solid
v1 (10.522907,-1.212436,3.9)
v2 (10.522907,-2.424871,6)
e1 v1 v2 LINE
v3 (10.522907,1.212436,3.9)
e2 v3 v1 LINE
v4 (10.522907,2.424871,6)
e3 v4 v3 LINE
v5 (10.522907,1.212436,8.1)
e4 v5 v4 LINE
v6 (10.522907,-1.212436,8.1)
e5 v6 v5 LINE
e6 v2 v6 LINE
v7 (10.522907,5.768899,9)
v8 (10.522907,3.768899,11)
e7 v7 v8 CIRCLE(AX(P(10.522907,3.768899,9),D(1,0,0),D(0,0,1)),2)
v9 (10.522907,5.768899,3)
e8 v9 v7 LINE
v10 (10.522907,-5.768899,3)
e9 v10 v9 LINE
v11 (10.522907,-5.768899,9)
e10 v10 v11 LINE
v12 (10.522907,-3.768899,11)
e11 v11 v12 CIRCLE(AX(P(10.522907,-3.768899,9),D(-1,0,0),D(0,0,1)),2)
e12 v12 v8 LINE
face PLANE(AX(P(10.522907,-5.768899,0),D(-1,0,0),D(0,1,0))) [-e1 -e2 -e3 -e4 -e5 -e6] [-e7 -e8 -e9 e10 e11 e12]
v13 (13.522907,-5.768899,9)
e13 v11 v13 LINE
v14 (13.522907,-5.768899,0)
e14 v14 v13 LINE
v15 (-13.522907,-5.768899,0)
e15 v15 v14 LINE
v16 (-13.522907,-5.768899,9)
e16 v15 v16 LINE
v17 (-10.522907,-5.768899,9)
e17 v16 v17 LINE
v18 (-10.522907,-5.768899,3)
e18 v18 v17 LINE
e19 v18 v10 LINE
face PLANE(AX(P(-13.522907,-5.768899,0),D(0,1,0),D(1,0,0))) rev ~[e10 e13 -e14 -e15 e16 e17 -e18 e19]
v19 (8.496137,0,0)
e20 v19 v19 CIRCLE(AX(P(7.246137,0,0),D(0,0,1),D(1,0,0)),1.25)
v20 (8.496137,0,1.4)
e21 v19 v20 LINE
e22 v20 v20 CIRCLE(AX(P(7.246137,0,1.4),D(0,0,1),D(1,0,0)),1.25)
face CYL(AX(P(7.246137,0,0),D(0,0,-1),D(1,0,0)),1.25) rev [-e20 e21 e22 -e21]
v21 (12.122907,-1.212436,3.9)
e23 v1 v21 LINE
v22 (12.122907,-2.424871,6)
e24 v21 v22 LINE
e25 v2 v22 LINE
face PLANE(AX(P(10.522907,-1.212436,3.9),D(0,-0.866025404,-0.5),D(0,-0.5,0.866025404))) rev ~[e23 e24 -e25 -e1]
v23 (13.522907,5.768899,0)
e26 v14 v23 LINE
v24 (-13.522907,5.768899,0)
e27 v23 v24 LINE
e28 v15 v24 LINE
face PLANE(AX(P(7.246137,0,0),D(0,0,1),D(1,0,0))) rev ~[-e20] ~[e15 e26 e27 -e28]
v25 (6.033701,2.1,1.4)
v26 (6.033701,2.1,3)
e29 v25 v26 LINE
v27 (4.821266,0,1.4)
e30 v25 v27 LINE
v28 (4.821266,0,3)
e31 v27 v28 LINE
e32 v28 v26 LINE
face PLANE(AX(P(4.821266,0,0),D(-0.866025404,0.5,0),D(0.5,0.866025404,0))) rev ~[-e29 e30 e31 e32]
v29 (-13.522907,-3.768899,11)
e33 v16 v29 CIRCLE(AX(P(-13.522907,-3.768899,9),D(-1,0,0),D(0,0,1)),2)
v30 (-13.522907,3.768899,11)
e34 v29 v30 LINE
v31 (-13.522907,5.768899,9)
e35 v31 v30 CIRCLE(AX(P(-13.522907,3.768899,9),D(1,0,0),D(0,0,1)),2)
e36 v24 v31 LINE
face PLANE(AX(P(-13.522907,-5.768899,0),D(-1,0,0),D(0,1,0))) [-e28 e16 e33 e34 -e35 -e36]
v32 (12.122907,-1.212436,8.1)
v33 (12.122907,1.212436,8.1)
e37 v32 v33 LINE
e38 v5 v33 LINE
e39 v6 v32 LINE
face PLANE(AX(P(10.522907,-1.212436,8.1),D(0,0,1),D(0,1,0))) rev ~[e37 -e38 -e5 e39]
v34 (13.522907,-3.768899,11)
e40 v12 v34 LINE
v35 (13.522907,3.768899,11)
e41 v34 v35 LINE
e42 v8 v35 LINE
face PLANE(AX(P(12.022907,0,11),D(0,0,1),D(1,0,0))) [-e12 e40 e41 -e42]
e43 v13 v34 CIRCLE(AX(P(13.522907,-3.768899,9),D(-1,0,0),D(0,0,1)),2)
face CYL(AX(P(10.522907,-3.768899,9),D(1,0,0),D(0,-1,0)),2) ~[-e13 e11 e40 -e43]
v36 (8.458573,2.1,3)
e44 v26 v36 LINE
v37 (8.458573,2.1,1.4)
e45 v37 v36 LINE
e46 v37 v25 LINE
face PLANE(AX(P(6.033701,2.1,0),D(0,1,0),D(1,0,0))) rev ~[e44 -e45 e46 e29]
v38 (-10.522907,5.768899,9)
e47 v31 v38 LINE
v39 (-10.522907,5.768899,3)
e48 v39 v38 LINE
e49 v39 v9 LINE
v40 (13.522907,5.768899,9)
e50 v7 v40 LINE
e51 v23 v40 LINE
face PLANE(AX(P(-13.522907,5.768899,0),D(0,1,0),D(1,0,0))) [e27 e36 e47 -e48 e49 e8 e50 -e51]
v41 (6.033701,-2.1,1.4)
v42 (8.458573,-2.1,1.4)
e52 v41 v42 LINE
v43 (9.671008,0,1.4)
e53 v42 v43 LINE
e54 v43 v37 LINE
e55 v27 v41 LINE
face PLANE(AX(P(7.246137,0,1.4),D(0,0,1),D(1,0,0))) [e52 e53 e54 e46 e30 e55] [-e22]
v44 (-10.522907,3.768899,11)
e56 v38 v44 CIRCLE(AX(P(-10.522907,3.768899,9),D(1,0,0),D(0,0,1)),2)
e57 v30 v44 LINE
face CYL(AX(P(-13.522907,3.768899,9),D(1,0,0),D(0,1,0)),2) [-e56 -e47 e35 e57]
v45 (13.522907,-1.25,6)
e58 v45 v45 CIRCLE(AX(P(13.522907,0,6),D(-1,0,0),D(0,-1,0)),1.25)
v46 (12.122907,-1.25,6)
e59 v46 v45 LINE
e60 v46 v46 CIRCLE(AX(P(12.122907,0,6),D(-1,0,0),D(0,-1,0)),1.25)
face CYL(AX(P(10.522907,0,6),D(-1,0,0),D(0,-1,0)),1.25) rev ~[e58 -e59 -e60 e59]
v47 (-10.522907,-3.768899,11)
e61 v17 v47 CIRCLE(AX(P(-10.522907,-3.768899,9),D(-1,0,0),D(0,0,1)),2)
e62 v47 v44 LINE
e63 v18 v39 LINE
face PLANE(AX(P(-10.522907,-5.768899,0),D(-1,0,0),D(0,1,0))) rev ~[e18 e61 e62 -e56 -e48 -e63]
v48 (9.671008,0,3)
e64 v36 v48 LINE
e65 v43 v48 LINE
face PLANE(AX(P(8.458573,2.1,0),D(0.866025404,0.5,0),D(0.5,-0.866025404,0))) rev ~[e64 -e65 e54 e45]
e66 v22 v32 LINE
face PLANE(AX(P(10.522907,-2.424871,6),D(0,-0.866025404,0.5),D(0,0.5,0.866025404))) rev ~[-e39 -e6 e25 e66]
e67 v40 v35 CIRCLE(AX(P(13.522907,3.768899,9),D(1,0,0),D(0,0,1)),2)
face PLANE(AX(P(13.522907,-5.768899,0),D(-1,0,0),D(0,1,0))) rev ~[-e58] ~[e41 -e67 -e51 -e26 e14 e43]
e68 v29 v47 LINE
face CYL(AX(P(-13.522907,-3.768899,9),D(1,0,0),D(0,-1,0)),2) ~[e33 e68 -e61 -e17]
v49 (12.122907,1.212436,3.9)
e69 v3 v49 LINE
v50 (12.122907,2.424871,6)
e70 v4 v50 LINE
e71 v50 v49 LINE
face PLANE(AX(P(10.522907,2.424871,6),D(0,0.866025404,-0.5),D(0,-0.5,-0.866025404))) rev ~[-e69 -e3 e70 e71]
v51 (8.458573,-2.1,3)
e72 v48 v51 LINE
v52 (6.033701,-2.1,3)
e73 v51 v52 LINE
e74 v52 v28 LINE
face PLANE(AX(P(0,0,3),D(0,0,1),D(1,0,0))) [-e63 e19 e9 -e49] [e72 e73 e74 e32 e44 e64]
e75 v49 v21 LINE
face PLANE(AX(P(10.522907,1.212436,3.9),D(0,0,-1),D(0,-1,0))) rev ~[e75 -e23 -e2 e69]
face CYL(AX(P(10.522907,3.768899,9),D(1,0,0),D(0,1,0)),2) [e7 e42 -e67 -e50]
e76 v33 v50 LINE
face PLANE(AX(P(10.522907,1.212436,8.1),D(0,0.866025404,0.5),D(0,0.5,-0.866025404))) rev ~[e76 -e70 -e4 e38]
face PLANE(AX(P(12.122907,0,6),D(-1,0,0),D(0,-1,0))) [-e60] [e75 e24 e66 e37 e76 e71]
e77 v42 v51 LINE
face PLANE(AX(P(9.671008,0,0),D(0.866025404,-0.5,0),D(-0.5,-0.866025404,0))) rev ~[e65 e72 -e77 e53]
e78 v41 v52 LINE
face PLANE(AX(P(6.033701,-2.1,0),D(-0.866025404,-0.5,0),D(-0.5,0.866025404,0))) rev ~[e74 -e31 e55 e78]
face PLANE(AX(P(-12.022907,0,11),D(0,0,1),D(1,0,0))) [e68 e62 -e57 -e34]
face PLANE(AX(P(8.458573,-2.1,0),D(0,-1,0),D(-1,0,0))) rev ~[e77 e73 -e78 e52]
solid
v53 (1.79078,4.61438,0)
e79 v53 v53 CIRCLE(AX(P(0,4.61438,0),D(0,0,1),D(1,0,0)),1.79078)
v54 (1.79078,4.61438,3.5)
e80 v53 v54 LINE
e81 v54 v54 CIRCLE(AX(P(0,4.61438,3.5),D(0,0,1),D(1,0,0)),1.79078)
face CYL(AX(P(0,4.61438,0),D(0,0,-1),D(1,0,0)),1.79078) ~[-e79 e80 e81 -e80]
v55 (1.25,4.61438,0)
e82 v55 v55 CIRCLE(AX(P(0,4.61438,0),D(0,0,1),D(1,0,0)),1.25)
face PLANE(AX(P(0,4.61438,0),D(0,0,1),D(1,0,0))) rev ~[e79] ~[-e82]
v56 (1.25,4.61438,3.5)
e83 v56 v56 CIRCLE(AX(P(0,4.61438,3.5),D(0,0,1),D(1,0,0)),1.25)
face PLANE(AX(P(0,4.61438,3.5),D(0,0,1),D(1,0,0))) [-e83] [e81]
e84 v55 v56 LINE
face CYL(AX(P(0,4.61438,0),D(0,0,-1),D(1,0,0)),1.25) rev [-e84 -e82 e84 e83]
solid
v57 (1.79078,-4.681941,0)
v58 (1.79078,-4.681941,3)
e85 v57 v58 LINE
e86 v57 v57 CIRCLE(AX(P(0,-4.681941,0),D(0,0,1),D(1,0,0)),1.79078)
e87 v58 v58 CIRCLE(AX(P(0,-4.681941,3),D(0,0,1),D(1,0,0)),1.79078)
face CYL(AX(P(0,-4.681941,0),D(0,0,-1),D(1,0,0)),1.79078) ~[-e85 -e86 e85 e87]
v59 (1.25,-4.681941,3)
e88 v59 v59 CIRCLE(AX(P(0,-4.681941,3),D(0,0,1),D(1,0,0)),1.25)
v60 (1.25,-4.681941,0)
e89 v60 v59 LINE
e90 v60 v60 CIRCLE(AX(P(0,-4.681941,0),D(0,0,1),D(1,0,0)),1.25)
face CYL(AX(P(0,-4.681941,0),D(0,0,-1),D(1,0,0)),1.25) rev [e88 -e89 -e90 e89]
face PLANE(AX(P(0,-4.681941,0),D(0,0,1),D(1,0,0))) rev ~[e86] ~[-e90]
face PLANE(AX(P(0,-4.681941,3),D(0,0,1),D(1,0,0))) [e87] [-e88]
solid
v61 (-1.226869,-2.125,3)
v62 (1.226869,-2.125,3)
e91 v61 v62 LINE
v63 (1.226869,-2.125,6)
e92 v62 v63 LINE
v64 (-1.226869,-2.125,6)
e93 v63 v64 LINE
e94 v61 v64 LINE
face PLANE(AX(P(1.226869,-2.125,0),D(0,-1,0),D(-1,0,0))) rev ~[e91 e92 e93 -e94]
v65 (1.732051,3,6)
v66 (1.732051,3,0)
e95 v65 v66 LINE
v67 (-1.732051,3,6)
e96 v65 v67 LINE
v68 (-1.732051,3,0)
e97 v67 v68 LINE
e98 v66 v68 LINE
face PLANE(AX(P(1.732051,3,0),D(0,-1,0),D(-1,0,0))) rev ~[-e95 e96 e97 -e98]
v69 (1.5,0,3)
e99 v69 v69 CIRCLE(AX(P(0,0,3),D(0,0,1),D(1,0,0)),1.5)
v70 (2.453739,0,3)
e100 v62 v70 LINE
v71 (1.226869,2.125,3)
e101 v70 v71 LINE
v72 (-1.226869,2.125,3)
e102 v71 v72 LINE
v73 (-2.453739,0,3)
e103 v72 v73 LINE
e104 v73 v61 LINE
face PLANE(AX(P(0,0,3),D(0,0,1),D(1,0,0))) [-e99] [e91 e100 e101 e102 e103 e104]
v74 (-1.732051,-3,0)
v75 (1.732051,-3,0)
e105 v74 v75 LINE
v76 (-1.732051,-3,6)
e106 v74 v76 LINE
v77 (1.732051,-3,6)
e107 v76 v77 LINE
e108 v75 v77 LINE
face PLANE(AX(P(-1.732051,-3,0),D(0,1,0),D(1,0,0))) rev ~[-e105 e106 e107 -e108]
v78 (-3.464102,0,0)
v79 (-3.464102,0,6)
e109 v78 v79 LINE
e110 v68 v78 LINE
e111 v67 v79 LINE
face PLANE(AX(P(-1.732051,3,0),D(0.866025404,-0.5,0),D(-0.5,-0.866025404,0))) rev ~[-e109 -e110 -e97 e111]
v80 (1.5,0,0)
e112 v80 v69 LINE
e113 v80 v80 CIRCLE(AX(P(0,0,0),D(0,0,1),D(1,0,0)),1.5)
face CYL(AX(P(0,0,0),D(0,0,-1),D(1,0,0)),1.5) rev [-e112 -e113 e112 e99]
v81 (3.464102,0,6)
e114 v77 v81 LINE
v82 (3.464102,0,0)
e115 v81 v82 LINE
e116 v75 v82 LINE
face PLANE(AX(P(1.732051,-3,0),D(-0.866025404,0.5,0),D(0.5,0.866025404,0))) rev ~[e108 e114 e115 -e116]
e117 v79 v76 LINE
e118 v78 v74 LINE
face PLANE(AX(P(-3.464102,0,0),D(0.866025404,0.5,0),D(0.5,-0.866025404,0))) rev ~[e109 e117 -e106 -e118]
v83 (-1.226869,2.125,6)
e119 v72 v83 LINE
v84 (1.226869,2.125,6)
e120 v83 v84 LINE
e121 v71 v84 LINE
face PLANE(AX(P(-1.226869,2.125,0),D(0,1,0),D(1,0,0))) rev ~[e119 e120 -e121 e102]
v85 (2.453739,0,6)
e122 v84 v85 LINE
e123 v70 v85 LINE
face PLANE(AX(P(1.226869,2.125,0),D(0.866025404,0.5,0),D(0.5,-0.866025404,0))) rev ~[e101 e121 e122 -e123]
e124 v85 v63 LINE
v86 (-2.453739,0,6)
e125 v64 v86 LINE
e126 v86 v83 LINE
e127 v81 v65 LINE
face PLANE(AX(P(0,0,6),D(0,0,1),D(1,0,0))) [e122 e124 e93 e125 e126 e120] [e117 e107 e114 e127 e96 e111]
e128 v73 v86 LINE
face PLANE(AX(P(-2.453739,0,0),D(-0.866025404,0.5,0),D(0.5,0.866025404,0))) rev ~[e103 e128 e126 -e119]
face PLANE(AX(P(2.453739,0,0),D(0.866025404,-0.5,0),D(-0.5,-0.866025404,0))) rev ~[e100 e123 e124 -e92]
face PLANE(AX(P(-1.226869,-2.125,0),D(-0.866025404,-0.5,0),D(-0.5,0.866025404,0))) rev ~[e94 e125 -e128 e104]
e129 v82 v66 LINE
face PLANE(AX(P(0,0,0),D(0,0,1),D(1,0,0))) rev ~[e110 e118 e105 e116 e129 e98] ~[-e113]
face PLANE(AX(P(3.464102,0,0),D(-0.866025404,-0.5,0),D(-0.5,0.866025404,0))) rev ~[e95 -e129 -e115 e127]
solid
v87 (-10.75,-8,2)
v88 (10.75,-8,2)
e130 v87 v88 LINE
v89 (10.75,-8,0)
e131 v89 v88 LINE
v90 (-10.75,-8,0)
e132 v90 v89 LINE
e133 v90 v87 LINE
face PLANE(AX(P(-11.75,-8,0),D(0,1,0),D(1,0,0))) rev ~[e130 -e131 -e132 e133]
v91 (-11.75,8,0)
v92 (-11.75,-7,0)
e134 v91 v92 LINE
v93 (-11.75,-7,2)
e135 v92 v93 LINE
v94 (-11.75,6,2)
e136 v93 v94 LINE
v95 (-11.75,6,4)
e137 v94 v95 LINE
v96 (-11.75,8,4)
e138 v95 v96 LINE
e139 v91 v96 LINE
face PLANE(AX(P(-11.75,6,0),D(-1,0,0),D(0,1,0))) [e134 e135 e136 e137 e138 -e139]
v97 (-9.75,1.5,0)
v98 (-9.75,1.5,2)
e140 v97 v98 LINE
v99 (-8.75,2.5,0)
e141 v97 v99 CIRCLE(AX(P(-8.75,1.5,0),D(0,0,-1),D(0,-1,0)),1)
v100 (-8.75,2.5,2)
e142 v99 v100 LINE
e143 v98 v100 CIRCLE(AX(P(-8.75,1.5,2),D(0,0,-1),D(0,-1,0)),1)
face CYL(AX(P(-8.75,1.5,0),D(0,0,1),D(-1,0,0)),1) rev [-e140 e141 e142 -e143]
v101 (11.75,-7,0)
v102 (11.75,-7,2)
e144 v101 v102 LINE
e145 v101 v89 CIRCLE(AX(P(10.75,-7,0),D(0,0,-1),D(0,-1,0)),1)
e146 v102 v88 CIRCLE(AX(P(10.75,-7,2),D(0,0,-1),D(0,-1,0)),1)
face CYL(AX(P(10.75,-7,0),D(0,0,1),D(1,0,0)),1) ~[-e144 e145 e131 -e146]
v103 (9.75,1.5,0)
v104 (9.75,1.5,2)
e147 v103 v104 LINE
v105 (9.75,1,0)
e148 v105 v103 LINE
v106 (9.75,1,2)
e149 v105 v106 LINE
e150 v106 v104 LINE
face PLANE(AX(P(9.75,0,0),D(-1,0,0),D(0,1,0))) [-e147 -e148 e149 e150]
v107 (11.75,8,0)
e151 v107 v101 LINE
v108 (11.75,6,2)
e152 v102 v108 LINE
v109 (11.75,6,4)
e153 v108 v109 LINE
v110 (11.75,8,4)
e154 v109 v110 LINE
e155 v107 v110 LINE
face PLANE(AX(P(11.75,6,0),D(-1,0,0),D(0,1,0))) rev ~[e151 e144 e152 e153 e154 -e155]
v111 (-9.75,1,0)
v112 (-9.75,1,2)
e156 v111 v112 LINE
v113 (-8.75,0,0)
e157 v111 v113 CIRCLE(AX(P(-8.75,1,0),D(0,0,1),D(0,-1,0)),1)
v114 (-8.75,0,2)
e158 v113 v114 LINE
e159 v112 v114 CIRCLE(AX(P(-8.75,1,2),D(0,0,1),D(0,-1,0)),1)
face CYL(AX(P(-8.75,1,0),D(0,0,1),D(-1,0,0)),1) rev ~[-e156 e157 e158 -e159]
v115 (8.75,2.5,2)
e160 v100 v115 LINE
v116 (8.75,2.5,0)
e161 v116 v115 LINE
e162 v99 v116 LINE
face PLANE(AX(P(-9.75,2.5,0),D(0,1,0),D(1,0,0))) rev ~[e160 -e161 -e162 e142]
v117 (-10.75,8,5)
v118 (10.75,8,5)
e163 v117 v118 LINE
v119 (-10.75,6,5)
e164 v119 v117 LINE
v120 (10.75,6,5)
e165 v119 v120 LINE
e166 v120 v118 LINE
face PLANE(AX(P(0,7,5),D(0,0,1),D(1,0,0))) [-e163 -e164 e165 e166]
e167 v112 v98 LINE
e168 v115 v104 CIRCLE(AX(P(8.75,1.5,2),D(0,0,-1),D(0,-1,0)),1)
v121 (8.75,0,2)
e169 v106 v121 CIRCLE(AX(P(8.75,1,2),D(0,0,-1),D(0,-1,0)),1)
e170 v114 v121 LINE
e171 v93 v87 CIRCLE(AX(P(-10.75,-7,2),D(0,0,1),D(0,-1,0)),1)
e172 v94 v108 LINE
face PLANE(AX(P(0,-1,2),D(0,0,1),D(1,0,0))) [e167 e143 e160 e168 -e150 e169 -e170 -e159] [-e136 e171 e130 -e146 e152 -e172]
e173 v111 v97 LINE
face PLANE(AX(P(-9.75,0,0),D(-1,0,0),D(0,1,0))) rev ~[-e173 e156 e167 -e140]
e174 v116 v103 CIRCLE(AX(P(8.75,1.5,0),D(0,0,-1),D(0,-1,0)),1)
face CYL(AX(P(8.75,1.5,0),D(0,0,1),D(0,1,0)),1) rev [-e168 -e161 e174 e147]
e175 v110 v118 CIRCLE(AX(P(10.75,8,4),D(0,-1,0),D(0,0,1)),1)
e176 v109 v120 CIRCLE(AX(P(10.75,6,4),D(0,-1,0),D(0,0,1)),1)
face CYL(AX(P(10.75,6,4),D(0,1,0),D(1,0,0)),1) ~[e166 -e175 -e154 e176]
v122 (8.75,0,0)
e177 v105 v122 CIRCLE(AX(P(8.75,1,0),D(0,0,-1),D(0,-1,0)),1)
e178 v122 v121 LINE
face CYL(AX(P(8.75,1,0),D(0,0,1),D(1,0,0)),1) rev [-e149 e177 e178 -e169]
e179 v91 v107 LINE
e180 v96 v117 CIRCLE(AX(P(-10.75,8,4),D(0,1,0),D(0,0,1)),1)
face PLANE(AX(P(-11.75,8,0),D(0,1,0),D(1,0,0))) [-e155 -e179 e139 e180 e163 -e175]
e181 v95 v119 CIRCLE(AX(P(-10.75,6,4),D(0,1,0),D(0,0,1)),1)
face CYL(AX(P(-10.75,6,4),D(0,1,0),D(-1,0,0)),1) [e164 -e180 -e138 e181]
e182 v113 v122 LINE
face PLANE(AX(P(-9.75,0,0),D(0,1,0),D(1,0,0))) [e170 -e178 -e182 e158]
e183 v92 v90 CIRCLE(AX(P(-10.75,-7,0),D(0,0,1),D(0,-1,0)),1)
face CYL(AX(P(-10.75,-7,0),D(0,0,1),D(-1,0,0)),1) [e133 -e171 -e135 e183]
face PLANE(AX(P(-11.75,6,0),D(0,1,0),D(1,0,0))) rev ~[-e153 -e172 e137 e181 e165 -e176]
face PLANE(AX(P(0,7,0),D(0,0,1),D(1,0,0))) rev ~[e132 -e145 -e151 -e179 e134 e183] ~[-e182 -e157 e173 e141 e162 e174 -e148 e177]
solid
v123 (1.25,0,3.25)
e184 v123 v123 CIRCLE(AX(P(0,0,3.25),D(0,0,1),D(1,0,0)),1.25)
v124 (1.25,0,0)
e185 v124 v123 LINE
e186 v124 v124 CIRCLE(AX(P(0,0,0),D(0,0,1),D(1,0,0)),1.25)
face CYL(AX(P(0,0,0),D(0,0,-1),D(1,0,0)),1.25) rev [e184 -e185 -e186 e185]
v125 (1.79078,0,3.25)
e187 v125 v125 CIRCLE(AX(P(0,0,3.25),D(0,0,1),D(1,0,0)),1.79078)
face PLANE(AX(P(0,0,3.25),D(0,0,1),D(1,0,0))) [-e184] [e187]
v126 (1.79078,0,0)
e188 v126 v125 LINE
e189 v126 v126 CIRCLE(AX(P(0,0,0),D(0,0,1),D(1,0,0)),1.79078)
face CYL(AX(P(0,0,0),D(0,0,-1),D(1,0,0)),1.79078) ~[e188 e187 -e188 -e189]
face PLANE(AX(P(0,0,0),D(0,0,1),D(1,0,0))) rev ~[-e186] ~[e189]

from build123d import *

# Parameters (mm, degrees)
F0_W      = 23.5
F0_H      = 14
F0_W_2    = 19.5
F0_H_2    = 2.5
F1_DEPTH  = 2
F0_H_3    = 2
F2_DEPTH  = 5
F3_R      = 1
F4_W      = 21.0458148676
F4_H      = 11.5377975056
F5_DEPTH  = 3
F4_W_2    = 3
F6_DEPTH  = 11
F4_R      = 1.25
F8_DEPTH  = 1.4
F7_R      = 1.25
F9_DEPTH  = 3.001
F10_DEPTH = 1.6
F11_R     = 2
F12_R     = 1.7907796981
F12_R_2   = 1.25
F13_DEPTH = 3.5
F14_DEPTH = 3.25
F15_DEPTH = 3
F16_R     = 1.5
F17_DEPTH = 3
F18_DEPTH = 6


with BuildPart() as f1:
    # F0 (on Top) → F1 (new body)
    with BuildSketch(Plane.XY):
        with Locations((0, -1)):
            Rectangle(F0_W, F0_H)
        with Locations((0, 1.25)):
            Rectangle(F0_W_2, F0_H_2, mode=Mode.SUBTRACT)
    extrude(amount=F1_DEPTH)

    # F0 (on Top) → F2 (join)
    with BuildSketch(Plane.XY):
        with Locations((0, 7)):
            Rectangle(F0_W, F0_H_3)
    extrude(amount=F2_DEPTH)

    # F3
    f3_edges = [f1.edges().sort_by_distance(p)[0] for p in [
        (-9.75, 2.5, 1),
        (-9.75, 0, 1),
        (9.75, 2.5, 1),
        (9.75, 0, 1),
        (11.75, 7, 5),
        (-11.75, 7, 5),
        (-11.75, -8, 1),
        (11.75, -8, 1),
    ]]
    fillet(f3_edges, radius=F3_R)


with BuildPart() as f5:
    # F4 (on Top) → F5 (new body)
    with BuildSketch(Plane.XY):
        Rectangle(F4_W, F4_H)
        Polygon((9.6710080965, 0), (8.4585725312, -2.1), (6.0337014006, -2.1), (4.8212658353, 0), (6.0337014006, 2.1), (8.4585725312, 2.1), align=None, mode=Mode.SUBTRACT)
    extrude(amount=F5_DEPTH)

    # F4 (on Top) → F6 (join)
    with BuildSketch(Plane.XY):
        with Locations((-12.0229074338, 0)):
            Rectangle(F4_W_2, F4_H)
        with Locations((12.0229074338, 0)):
            Rectangle(F4_W_2, F4_H)
    extrude(amount=F6_DEPTH)

    # F4 (on Top) → F8 (join)
    with BuildSketch(Plane.XY):
        Polygon((6.0337014006, -2.1), (8.4585725312, -2.1), (9.6710080965, 0), (8.4585725312, 2.1), (6.0337014006, 2.1), (4.8212658353, 0), align=None)
        with Locations((7.2461369659, 0)):
            Circle(F4_R, mode=Mode.SUBTRACT)
    extrude(amount=F8_DEPTH)

    # F7 (on face) → F9 (cut, through all)
    with BuildSketch(Plane(origin=(10.5229074338, 0, 0), x_dir=(0, -1, 0), z_dir=(-1, 0, 0))):
        with Locations((0, 6)):
            Circle(F7_R)
    extrude(amount=-F9_DEPTH, mode=Mode.SUBTRACT)

    # F7 (on face) → F10 (cut)
    with BuildSketch(Plane(origin=(10.5229074338, 0, 0), x_dir=(0, -1, 0), z_dir=(-1, 0, 0))):
        Polygon((-1.2124355653, 3.9), (1.2124355653, 3.9), (2.4248711306, 6), (1.2124355653, 8.1), (-1.2124355653, 8.1), (-2.4248711306, 6), align=None)
        with Locations((0, 6)):
            Circle(F7_R, mode=Mode.SUBTRACT)
    extrude(amount=-F10_DEPTH, mode=Mode.SUBTRACT)

    # F11
    f11_edges = [f5.edges().sort_by_distance(p)[0] for p in [
        (-12.022907, -5.768899, 11),
        (12.022907, -5.768899, 11),
        (12.022907, 5.768899, 11),
        (-12.022907, 5.768899, 11),
    ]]
    fillet(f11_edges, radius=F11_R)


with BuildPart() as f13:
    # F12 (on Top) → F13 (new body)
    with BuildSketch(Plane.XY):
        with Locations((0, 4.6143797226)):
            Circle(F12_R)
        with Locations((0, 4.6143797226)):
            Circle(F12_R_2, mode=Mode.SUBTRACT)
    extrude(amount=F13_DEPTH)


with BuildPart() as f14:
    # F12 (on Top) → F14 (new body)
    with BuildSketch(Plane.XY):
        Circle(F12_R)
        Circle(F12_R_2, mode=Mode.SUBTRACT)
    extrude(amount=F14_DEPTH)


with BuildPart() as f15:
    # F12 (on Top) → F15 (new body)
    with BuildSketch(Plane.XY):
        with Locations((0, -4.6819411218)):
            Circle(F12_R)
        with Locations((0, -4.6819411218)):
            Circle(F12_R_2, mode=Mode.SUBTRACT)
    extrude(amount=F15_DEPTH)


with BuildPart() as f17:
    # F16 (on Top) → F17 (new body)
    with BuildSketch(Plane.XY):
        Polygon((-1.7320508076, 3), (-3.4641016151, 0), (-1.7320508076, -3), (1.7320508076, -3), (3.4641016151, 0), (1.7320508076, 3), align=None)
        Polygon((-1.226869322, -2.125), (-2.4537386441, 0), (-1.226869322, 2.125), (1.226869322, 2.125), (2.4537386441, 0), (1.226869322, -2.125), align=None, mode=Mode.SUBTRACT)
        Polygon((-1.226869322, 2.125), (-2.4537386441, 0), (-1.226869322, -2.125), (1.226869322, -2.125), (2.4537386441, 0), (1.226869322, 2.125), align=None)
        Circle(F16_R, mode=Mode.SUBTRACT)
    extrude(amount=F17_DEPTH)

    # F16 (on Top) → F18 (join)
    with BuildSketch(Plane.XY):
        Polygon((-1.7320508076, 3), (-3.4641016151, 0), (-1.7320508076, -3), (1.7320508076, -3), (3.4641016151, 0), (1.7320508076, 3), align=None)
        Polygon((-1.226869322, -2.125), (-2.4537386441, 0), (-1.226869322, 2.125), (1.226869322, 2.125), (2.4537386441, 0), (1.226869322, -2.125), align=None, mode=Mode.SUBTRACT)
    extrude(amount=F18_DEPTH)


solid = Compound([f1.part, f5.part, f13.part, f14.part, f15.part, f17.part])
